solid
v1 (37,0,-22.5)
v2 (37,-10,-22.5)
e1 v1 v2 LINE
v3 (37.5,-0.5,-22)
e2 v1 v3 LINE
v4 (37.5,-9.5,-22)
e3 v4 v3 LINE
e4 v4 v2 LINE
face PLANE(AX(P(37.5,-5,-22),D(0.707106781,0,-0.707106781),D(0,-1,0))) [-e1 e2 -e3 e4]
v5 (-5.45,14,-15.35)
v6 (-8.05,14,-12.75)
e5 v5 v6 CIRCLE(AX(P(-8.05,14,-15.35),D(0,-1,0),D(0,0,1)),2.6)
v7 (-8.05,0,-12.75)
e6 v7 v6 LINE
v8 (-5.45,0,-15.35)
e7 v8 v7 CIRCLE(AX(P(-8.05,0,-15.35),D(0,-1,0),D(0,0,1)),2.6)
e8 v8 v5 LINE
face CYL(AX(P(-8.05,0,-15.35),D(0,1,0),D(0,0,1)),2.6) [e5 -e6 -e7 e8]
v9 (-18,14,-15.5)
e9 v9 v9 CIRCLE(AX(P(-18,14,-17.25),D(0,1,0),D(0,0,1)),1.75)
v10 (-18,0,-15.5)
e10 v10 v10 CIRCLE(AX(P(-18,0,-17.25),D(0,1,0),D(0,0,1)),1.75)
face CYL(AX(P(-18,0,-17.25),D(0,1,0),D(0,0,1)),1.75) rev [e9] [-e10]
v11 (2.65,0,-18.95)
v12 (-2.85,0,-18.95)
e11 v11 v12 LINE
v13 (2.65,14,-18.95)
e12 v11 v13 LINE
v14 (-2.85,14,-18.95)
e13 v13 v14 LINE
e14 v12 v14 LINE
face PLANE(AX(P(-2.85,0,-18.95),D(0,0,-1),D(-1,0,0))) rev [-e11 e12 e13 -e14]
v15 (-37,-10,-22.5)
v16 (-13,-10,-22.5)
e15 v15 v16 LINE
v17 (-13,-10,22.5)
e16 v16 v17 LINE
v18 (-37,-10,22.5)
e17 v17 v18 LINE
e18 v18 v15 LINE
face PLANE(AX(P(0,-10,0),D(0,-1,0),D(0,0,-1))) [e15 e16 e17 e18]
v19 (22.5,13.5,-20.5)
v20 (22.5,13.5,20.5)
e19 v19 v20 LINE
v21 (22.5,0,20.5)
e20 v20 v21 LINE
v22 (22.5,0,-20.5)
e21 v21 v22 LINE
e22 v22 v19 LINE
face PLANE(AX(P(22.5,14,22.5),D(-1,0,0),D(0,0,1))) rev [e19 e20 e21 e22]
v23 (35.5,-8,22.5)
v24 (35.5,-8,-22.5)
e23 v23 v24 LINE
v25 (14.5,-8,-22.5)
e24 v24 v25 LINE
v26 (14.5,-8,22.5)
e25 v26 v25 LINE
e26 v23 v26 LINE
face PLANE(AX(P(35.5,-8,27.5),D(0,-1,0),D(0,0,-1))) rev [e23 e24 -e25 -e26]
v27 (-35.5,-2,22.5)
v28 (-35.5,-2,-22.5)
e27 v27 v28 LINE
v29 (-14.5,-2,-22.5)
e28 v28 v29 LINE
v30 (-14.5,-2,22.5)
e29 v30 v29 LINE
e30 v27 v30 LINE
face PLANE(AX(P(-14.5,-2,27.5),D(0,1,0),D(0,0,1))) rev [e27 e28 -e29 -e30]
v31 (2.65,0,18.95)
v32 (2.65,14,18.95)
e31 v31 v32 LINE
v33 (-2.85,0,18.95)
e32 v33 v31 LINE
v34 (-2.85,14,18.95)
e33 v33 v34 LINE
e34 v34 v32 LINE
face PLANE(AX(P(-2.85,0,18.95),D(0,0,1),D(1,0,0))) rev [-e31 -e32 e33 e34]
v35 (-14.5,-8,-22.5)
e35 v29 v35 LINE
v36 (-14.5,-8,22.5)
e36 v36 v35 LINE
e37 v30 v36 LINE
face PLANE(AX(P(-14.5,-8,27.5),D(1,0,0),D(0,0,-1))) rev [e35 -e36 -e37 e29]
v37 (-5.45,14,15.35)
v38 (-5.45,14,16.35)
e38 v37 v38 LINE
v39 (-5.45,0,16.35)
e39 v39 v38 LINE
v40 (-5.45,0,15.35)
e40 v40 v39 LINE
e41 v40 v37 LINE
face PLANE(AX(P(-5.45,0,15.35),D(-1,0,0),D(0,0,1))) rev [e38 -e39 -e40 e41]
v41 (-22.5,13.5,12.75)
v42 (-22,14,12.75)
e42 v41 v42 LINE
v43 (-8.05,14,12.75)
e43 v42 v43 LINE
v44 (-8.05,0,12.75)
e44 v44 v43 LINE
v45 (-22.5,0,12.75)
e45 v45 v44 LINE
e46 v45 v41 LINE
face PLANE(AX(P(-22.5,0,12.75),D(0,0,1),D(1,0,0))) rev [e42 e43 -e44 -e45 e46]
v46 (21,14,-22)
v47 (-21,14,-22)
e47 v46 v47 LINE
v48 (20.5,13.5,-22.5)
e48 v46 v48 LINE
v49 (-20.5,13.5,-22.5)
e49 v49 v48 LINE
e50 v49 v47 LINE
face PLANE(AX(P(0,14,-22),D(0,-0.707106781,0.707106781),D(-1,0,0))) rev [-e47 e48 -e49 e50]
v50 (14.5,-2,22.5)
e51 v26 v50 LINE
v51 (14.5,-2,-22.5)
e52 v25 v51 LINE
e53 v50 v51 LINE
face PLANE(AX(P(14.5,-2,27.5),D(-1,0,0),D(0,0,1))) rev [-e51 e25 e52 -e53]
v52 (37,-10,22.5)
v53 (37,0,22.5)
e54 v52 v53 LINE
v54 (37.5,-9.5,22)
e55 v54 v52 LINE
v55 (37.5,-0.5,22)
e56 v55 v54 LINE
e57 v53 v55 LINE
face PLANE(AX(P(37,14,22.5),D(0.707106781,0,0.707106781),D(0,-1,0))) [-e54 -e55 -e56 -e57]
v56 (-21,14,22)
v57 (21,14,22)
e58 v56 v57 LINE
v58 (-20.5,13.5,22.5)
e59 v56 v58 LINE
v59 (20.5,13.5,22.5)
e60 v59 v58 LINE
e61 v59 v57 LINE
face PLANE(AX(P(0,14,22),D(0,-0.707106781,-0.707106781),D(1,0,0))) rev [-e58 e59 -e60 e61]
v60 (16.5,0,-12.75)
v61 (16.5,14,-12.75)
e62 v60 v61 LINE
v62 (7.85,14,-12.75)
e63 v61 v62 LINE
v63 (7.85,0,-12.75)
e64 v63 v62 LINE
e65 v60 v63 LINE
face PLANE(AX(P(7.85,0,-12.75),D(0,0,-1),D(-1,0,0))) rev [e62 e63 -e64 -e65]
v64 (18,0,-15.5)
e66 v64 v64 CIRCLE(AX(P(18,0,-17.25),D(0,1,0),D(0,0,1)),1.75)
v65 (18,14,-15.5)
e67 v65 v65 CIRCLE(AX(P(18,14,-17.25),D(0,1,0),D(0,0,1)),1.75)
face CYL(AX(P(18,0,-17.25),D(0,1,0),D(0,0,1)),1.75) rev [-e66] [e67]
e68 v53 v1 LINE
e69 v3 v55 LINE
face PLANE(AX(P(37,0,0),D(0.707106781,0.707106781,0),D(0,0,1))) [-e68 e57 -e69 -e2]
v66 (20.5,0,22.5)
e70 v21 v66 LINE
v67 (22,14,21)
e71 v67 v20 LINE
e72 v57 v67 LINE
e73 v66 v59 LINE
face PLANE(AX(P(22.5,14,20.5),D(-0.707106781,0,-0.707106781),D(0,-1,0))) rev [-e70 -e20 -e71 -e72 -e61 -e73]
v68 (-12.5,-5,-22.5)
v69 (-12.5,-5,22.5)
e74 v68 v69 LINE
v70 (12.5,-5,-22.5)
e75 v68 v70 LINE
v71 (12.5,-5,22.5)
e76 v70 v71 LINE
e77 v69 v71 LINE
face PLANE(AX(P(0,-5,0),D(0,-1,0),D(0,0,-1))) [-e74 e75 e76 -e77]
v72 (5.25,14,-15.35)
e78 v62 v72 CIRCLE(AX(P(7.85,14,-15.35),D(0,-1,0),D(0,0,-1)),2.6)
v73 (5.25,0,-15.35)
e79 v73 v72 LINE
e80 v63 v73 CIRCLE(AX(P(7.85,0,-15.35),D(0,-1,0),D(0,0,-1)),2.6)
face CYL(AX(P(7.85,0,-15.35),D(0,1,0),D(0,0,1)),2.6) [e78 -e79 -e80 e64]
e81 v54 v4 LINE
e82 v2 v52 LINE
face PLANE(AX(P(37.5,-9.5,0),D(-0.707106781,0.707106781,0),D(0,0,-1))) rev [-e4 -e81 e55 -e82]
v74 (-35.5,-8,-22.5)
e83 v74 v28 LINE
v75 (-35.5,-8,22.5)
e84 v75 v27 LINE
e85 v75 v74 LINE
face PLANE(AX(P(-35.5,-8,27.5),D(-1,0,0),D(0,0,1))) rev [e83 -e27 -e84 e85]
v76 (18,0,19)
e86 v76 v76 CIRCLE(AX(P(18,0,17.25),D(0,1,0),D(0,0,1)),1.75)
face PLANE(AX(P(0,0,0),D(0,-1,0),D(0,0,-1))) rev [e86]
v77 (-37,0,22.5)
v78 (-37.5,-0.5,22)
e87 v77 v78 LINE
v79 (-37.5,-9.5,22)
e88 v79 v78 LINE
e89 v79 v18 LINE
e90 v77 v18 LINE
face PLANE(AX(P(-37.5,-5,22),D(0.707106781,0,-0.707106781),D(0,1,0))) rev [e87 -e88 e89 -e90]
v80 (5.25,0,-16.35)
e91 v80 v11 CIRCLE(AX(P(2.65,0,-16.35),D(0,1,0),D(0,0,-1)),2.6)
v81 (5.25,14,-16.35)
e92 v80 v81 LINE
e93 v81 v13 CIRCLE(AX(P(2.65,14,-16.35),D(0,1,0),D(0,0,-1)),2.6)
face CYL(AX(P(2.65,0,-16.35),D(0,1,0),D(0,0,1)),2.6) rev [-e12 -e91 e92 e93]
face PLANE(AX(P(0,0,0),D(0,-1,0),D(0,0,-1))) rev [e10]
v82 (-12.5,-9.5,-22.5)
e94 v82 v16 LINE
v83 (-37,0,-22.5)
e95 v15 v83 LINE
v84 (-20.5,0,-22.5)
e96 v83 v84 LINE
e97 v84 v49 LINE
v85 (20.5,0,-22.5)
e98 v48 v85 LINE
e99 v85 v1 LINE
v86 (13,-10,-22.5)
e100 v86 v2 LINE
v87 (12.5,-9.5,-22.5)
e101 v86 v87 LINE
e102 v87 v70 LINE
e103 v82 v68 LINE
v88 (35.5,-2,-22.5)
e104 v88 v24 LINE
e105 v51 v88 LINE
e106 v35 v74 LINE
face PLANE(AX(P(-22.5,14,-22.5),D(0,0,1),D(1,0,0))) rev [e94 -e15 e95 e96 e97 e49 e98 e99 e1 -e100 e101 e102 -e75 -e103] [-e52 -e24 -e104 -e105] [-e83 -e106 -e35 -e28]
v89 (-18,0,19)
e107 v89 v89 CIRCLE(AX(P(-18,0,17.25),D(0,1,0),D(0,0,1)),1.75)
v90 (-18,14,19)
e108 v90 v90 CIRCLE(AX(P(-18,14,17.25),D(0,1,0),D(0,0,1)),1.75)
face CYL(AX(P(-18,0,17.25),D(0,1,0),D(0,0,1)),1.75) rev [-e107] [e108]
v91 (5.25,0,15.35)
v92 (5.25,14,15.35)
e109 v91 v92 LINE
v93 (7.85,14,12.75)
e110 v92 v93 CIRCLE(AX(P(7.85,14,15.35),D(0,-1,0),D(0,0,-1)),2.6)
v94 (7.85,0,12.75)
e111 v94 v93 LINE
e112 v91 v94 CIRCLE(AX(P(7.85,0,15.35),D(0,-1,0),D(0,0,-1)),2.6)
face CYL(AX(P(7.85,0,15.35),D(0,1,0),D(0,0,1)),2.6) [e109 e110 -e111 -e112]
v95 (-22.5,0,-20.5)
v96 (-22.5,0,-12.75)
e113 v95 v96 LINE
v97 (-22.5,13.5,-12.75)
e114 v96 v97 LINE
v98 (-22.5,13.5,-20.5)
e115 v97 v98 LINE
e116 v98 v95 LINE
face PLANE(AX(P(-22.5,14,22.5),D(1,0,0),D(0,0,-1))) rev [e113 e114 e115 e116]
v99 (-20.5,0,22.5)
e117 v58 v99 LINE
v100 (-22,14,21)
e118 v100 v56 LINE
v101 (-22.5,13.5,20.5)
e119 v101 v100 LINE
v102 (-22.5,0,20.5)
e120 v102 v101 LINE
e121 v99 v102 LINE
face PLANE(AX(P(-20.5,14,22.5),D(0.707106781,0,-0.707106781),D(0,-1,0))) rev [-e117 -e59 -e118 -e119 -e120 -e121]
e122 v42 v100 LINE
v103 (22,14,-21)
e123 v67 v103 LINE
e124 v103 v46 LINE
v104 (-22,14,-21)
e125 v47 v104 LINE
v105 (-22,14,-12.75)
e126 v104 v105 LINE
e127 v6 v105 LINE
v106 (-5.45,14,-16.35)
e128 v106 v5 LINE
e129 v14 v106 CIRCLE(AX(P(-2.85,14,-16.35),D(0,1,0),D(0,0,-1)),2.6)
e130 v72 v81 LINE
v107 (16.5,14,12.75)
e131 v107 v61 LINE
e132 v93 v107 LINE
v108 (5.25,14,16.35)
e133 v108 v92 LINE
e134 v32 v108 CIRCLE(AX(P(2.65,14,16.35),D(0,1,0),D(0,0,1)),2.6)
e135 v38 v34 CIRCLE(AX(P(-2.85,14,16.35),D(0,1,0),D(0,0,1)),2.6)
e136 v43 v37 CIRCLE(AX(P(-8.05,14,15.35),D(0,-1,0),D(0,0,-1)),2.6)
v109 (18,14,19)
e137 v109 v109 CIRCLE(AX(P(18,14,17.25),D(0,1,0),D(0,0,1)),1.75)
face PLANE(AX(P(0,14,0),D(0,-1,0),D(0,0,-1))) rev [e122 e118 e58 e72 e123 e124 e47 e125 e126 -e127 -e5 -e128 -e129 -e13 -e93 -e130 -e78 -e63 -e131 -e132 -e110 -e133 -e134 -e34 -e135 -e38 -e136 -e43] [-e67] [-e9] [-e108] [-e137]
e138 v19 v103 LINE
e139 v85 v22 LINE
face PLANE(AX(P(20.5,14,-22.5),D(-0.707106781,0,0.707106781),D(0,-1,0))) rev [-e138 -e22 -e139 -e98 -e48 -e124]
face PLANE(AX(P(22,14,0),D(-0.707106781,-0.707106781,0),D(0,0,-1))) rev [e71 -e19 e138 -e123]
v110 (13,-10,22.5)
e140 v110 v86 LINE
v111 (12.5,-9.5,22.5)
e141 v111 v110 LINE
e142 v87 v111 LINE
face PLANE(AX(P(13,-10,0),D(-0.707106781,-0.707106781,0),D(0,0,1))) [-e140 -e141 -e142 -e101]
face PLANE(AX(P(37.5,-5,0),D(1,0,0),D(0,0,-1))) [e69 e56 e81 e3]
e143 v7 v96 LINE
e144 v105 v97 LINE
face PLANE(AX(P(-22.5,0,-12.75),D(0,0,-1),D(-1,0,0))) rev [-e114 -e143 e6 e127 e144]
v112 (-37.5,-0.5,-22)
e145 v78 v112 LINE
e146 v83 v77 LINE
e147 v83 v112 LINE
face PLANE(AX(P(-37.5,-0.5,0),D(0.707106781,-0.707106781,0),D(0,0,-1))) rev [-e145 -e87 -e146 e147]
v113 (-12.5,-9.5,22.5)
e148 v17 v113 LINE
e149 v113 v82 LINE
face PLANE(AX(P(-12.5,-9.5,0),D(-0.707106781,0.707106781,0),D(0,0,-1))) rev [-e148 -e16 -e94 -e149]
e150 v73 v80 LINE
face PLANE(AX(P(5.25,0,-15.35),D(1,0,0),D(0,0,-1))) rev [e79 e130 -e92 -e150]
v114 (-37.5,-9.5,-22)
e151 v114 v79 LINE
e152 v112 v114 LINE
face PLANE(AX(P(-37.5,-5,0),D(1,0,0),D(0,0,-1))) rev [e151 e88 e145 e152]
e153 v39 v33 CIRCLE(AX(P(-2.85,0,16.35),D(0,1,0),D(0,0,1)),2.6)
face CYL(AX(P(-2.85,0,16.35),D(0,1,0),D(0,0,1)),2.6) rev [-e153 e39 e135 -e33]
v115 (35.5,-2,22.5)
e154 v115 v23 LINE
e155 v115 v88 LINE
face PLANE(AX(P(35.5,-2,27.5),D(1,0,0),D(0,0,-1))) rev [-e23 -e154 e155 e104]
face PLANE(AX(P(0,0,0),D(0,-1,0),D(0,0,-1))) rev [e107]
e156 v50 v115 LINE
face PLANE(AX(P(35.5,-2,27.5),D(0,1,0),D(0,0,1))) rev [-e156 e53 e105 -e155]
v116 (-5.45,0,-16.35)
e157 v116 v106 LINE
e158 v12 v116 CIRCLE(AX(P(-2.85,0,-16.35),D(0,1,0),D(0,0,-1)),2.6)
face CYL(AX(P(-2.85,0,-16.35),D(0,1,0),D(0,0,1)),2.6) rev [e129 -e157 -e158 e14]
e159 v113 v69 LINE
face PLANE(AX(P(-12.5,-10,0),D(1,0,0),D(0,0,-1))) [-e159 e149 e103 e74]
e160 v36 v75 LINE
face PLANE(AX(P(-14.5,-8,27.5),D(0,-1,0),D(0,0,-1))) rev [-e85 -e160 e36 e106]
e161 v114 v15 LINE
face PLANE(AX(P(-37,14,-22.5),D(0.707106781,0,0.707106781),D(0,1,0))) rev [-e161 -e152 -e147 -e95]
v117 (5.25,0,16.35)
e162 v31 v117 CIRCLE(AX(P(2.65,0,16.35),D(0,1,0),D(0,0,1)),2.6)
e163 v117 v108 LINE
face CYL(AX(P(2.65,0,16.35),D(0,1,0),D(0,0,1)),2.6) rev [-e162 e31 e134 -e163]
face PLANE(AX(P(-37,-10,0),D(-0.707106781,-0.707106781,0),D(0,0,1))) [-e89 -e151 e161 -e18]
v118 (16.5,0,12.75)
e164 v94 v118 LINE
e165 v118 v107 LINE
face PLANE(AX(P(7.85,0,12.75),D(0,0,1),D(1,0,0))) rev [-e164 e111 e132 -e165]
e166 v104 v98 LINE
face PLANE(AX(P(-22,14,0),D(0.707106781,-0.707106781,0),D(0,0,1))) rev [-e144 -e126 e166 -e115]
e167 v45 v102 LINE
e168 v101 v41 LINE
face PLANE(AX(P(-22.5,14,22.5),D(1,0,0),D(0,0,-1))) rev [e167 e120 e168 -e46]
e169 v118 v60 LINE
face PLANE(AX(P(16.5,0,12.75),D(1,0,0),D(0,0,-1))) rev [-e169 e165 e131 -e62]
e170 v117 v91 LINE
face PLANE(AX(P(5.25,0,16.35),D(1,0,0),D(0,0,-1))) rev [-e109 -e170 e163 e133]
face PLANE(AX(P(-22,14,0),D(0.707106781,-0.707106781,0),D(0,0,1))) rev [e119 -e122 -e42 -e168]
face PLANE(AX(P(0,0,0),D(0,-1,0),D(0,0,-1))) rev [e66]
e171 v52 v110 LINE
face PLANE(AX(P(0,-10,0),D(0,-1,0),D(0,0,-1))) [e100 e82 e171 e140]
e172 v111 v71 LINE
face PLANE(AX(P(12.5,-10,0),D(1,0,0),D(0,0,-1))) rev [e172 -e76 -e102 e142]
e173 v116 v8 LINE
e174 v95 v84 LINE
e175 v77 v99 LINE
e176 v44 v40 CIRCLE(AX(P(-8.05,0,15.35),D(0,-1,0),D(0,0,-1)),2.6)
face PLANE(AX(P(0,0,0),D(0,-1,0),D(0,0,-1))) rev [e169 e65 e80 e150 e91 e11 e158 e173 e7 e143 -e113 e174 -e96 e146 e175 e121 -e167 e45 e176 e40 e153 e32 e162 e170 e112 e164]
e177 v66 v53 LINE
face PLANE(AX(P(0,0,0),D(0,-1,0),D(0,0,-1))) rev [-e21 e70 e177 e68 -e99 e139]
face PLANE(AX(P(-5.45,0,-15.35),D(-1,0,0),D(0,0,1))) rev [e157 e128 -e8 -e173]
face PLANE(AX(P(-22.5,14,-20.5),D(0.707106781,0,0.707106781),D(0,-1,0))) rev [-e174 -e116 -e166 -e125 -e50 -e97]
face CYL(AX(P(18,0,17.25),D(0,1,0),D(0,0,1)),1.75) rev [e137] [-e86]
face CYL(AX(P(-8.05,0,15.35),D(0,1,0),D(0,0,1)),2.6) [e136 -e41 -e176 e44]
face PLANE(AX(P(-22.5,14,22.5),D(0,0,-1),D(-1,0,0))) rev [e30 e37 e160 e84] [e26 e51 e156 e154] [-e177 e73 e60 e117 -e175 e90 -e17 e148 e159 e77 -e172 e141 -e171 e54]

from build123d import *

# Parameters (mm, degrees)
SKETCH1_W           = 45
SKETCH1_H           = 45
BOSS_EXTRUDE1_DEPTH = 14
CUT_EXTRUDE1_DEPTH  = 35.763486592
CHAMFER1_SIZE       = 0.5
CHAMFER2_SIZE       = 2
SKETCH4_R           = 1.75
CUT_EXTRUDE2_DEPTH  = 35.763486592
SKETCH5_R           = 1.75
SKETCH5_W           = 4
SKETCH5_H           = 25.5
BOSS_EXTRUDE4_DEPTH = 5
SKETCH5_3_R         = 1.75
SKETCH5_3_W         = 4
SKETCH5_3_H         = 25.5
BOSS_EXTRUDE5_DEPTH = 10
SKETCH10_W          = 21
SKETCH10_H          = 6
CUT_EXTRUDE3_DEPTH  = 50
CHAMFER5_SIZE       = 0.5


with BuildPart() as part:
    # Sketch1 → Boss-Extrude1 (new body)
    with BuildSketch(Plane(origin=(0, 0, 0), x_dir=(1, 0, 0), z_dir=(0, 1, 0))):
        Rectangle(SKETCH1_W, SKETCH1_H)
    extrude(amount=BOSS_EXTRUDE1_DEPTH)

    # Sketch3 → Cut-Extrude1 (cut, through all)
    with BuildSketch(Plane(origin=(0, 14, 0), x_dir=(1, 0, 0), z_dir=(0, 1, 0))):
        with BuildLine():
            Line((-22.5, 12.75), (-8.05, 12.75))
            ThreePointArc((-8.05, 12.75), (-6.211522369, 13.511522369), (-5.45, 15.35))
            Line((-5.45, 15.35), (-5.45, 16.35))
            ThreePointArc((-5.45, 16.35), (-4.688477631, 18.188477631), (-2.85, 18.95))
            Line((-2.85, 18.95), (2.65, 18.95))
            ThreePointArc((2.65, 18.95), (4.488477631, 18.188477631), (5.25, 16.35))
            Line((5.25, 16.35), (5.25, 15.35))
            ThreePointArc((5.25, 15.35), (6.011522369, 13.511522369), (7.85, 12.75))
            Line((7.85, 12.75), (16.5, 12.75))
            Line((16.5, 12.75), (16.5, -12.75))
            Line((16.5, -12.75), (7.85, -12.75))
            ThreePointArc((7.85, -12.75), (6.011522369, -13.511522369), (5.25, -15.35))
            Line((5.25, -15.35), (5.25, -16.35))
            ThreePointArc((5.25, -16.35), (4.488477631, -18.188477631), (2.65, -18.95))
            Line((2.65, -18.95), (-2.85, -18.95))
            ThreePointArc((-2.85, -18.95), (-4.688477631, -18.188477631), (-5.45, -16.35))
            Line((-5.45, -16.35), (-5.45, -15.35))
            ThreePointArc((-5.45, -15.35), (-6.211522369, -13.511522369), (-8.05, -12.75))
            Line((-8.05, -12.75), (-22.5, -12.75))
            Line((-22.5, -12.75), (-22.5, 12.75))
        make_face()
    extrude(amount=-CUT_EXTRUDE1_DEPTH, mode=Mode.SUBTRACT)

    # Chamfer1
    chamfer1_edges = [part.edges().sort_by_distance(p)[0] for p in [
        (-22.5, 14, -17.625),
        (0, 14, 22.5),
        (-22.5, 14, 17.625),
        (22.5, 14, 0),
        (0, 14, -22.5),
    ]]
    chamfer(chamfer1_edges, length=CHAMFER1_SIZE)

    # Chamfer2
    # the kernel refuses this chamfer: 5.464101615, 2 mm, written as the material it takes off along each edge
    # the kernel refuses this chamfer: 5.464101615, 2 mm, written as the material it takes off along each edge
    with BuildSketch(Plane(origin=(-22.5, -5.143365976, -22.5), x_dir=(-0.027495876610585647, 0, 0.9996219169112968), z_dir=(0, 1, 0)), Plane(origin=(-22.5, -5.143365976, 22.5), x_dir=(0.9996219169112968, 0, 0.027495876610585647), z_dir=(0, 1, 0))) as chamfer2_2_piece_1:
        Polygon((CHAMFER2_SIZE * 0.999621916911, CHAMFER2_SIZE * 0.0274958766106), (-CHAMFER2_SIZE * 0.0274958766106, CHAMFER2_SIZE * 0.999621916911), (0, 0), align=None)
    extrude(amount=23.786731952, mode=Mode.SUBTRACT)
    with BuildSketch(Plane(origin=(22.5, -5.143365976, 22.5), x_dir=(-0.9996219169112968, 0, 0.027495876610585647), z_dir=(0, 1, 0)), Plane(origin=(22.5, -5.143365976, -22.5), x_dir=(0.027495876610585647, 0, 0.9996219169112968), z_dir=(0, 1, 0))) as chamfer2_2_piece_2:
        Polygon((CHAMFER2_SIZE * 0.999621916911, -CHAMFER2_SIZE * 0.0274958766106), (-CHAMFER2_SIZE * 0.0274958766106, -CHAMFER2_SIZE * 0.999621916911), (0, 0), align=None)
    extrude(amount=23.786731952, mode=Mode.SUBTRACT)

    # Sketch4 → Cut-Extrude2 (cut, through all)
    with BuildSketch(Plane(origin=(0, 14, 0), x_dir=(1, 0, 0), z_dir=(0, 1, 0))):
        with Locations(Location((-18, 17.25, 0), (0, 0, 270))):
            Circle(SKETCH4_R)
        with Locations(Location((18, 17.25, 0), (0, 0, 270))):
            Circle(SKETCH4_R)
        with Locations(Location((18, -17.25, 0), (0, 0, 270))):
            Circle(SKETCH4_R)
        with Locations(Location((-18, -17.25, 0), (0, 0, 270))):
            Circle(SKETCH4_R)
    extrude(amount=-CUT_EXTRUDE2_DEPTH, mode=Mode.SUBTRACT)

    # Sketch5 → Boss-Extrude4 (add)
    # profile 1 of 13: a face of its own
    with BuildSketch(Plane.XZ):
        Polygon((-20.5, 22.5), (-37.5, 22.5), (-37.5, -22.5), (-20.5, -22.5), (-22.5, -20.5), (-22.5, -12.75), (-12.5, -12.75), (-12.5, 12.75), (-22.5, 12.75), (-22.5, 20.5), align=None)
    # profile 2 of 13: a face of its own
    with BuildSketch(Plane.XZ):
        with BuildLine():
            Line((-8.05, 12.75), (-12.5, 12.75))
            Line((-12.5, 12.75), (-12.5, -12.75))
            Line((-12.5, -12.75), (-8.05, -12.75))
            ThreePointArc((-8.05, -12.75), (-6.211522369, -13.511522369), (-5.45, -15.35))
            Line((-5.45, -15.35), (-5.45, -16.35))
            ThreePointArc((-5.45, -16.35), (-4.688477631, -18.188477631), (-2.85, -18.95))
            Line((-2.85, -18.95), (2.65, -18.95))
            ThreePointArc((2.65, -18.95), (4.488477631, -18.188477631), (5.25, -16.35))
            Line((5.25, -16.35), (5.25, -15.35))
            ThreePointArc((5.25, -15.35), (6.011522369, -13.511522369), (7.85, -12.75))
            Line((7.85, -12.75), (12.5, -12.75))
            Line((12.5, -12.75), (12.5, 12.75))
            Line((12.5, 12.75), (7.85, 12.75))
            ThreePointArc((7.85, 12.75), (6.011522369, 13.511522369), (5.25, 15.35))
            Line((5.25, 15.35), (5.25, 16.35))
            ThreePointArc((5.25, 16.35), (4.488477631, 18.188477631), (2.65, 18.95))
            Line((2.65, 18.95), (-2.85, 18.95))
            ThreePointArc((-2.85, 18.95), (-4.688477631, 18.188477631), (-5.45, 16.35))
            Line((-5.45, 16.35), (-5.45, 15.35))
            ThreePointArc((-5.45, 15.35), (-6.211522369, 13.511522369), (-8.05, 12.75))
        make_face()
    # profile 3 of 13: a face of its own
    with BuildSketch(Plane.XZ):
        with BuildLine():
            Line((12.5, 22.5), (-12.5, 22.5))
            Line((-12.5, 22.5), (-12.5, 12.75))
            Line((-12.5, 12.75), (-8.05, 12.75))
            ThreePointArc((-8.05, 12.75), (-6.211522369, 13.511522369), (-5.45, 15.35))
            Line((-5.45, 15.35), (-5.45, 16.35))
            ThreePointArc((-5.45, 16.35), (-4.688477631, 18.188477631), (-2.85, 18.95))
            Line((-2.85, 18.95), (2.65, 18.95))
            ThreePointArc((2.65, 18.95), (4.488477631, 18.188477631), (5.25, 16.35))
            Line((5.25, 16.35), (5.25, 15.35))
            ThreePointArc((5.25, 15.35), (6.011522369, 13.511522369), (7.85, 12.75))
            Line((7.85, 12.75), (12.5, 12.75))
            Line((12.5, 12.75), (12.5, 22.5))
        make_face()
    # profile 4 of 13: a face of its own
    with BuildSketch(Plane.XZ):
        Polygon((-12.5, 22.5), (-20.5, 22.5), (-22.5, 20.5), (-22.5, 12.75), (-12.5, 12.75), align=None)
        with Locations(Location((-18, 17.25, 0), (0, 0, 90))):
            Circle(SKETCH5_R, mode=Mode.SUBTRACT)
    # profile 5 of 13: a face of its own
    with BuildSketch(Plane.XZ):
        Polygon((20.5, 22.5), (12.5, 22.5), (12.5, 12.75), (16.5, 12.75), (16.5, -12.75), (12.5, -12.75), (12.5, -22.5), (20.5, -22.5), (22.5, -20.5), (22.5, 20.5), align=None)
        with Locations(Location((18, -17.25, 0), (0, 0, 90))):
            Circle(SKETCH5_R, mode=Mode.SUBTRACT)
        with Locations(Location((18, 17.25, 0), (0, 0, 90))):
            Circle(SKETCH5_R, mode=Mode.SUBTRACT)
    # profile 6 of 13: a face of its own
    with BuildSketch(Plane.XZ):
        Polygon((37.5, 22.5), (20.5, 22.5), (22.5, 20.5), (22.5, -20.5), (20.5, -22.5), (37.5, -22.5), align=None)
    # profile 7 of 13: a face of its own
    with BuildSketch(Plane.XZ):
        with BuildLine():
            Line((-12.5, -12.75), (-12.5, -22.5))
            Line((-12.5, -22.5), (12.5, -22.5))
            Line((12.5, -22.5), (12.5, -12.75))
            Line((12.5, -12.75), (7.85, -12.75))
            ThreePointArc((7.85, -12.75), (6.011522369, -13.511522369), (5.25, -15.35))
            Line((5.25, -15.35), (5.25, -16.35))
            ThreePointArc((5.25, -16.35), (4.488477631, -18.188477631), (2.65, -18.95))
            Line((2.65, -18.95), (-2.85, -18.95))
            ThreePointArc((-2.85, -18.95), (-4.688477631, -18.188477631), (-5.45, -16.35))
            Line((-5.45, -16.35), (-5.45, -15.35))
            ThreePointArc((-5.45, -15.35), (-6.211522369, -13.511522369), (-8.05, -12.75))
            Line((-8.05, -12.75), (-12.5, -12.75))
        make_face()
    # profile 8 of 13: a face of its own
    with BuildSketch(Plane.XZ):
        Polygon((-22.5, -20.5), (-20.5, -22.5), (-12.5, -22.5), (-12.5, -12.75), (-22.5, -12.75), align=None)
        with Locations(Location((-18, -17.25, 0), (0, 0, 90))):
            Circle(SKETCH5_R, mode=Mode.SUBTRACT)
    # profile 9 of 13: a face of its own
    with BuildSketch(Plane.XZ):
        with Locations((14.5, 0)):
            Rectangle(SKETCH5_W, SKETCH5_H)
    # profile 10 of 13: a face of its own
    with BuildSketch(Plane.XZ):
        with Locations(Location((18, 17.25, 0), (0, 0, 90))):
            Circle(SKETCH5_R)
    # profile 11 of 13: a face of its own
    with BuildSketch(Plane.XZ):
        with Locations(Location((-18, 17.25, 0), (0, 0, 90))):
            Circle(SKETCH5_R)
    # profile 12 of 13: a face of its own
    with BuildSketch(Plane.XZ):
        with Locations(Location((-18, -17.25, 0), (0, 0, 90))):
            Circle(SKETCH5_R)
    # profile 13 of 13: a face of its own
    with BuildSketch(Plane.XZ):
        with Locations(Location((18, -17.25, 0), (0, 0, 90))):
            Circle(SKETCH5_R)
    extrude(amount=BOSS_EXTRUDE4_DEPTH)

    # Sketch5<3> → Boss-Extrude5 (add)
    # profile 1 of 10: a face of its own
    with BuildSketch(Plane.XZ):
        Polygon((-12.5, 22.5), (-20.5, 22.5), (-22.5, 20.5), (-22.5, 12.75), (-12.5, 12.75), align=None)
        with Locations(Location((-18, 17.25, 0), (0, 0, 90))):
            Circle(SKETCH5_3_R, mode=Mode.SUBTRACT)
    # profile 2 of 10: a face of its own
    with BuildSketch(Plane.XZ):
        Polygon((-20.5, 22.5), (-37.5, 22.5), (-37.5, -22.5), (-20.5, -22.5), (-22.5, -20.5), (-22.5, -12.75), (-12.5, -12.75), (-12.5, 12.75), (-22.5, 12.75), (-22.5, 20.5), align=None)
    # profile 3 of 10: a face of its own
    with BuildSketch(Plane.XZ):
        Polygon((-22.5, -20.5), (-20.5, -22.5), (-12.5, -22.5), (-12.5, -12.75), (-22.5, -12.75), align=None)
        with Locations(Location((-18, -17.25, 0), (0, 0, 90))):
            Circle(SKETCH5_3_R, mode=Mode.SUBTRACT)
    # profile 4 of 10: a face of its own
    with BuildSketch(Plane.XZ):
        with Locations(Location((-18, 17.25, 0), (0, 0, 90))):
            Circle(SKETCH5_3_R)
    # profile 5 of 10: a face of its own
    with BuildSketch(Plane.XZ):
        with Locations(Location((-18, -17.25, 0), (0, 0, 90))):
            Circle(SKETCH5_3_R)
    # profile 6 of 10: a face of its own
    with BuildSketch(Plane.XZ):
        Polygon((20.5, 22.5), (12.5, 22.5), (12.5, 12.75), (16.5, 12.75), (16.5, -12.75), (12.5, -12.75), (12.5, -22.5), (20.5, -22.5), (22.5, -20.5), (22.5, 20.5), align=None)
        with Locations(Location((18, -17.25, 0), (0, 0, 90))):
            Circle(SKETCH5_3_R, mode=Mode.SUBTRACT)
        with Locations(Location((18, 17.25, 0), (0, 0, 90))):
            Circle(SKETCH5_3_R, mode=Mode.SUBTRACT)
    # profile 7 of 10: a face of its own
    with BuildSketch(Plane.XZ):
        Polygon((37.5, 22.5), (20.5, 22.5), (22.5, 20.5), (22.5, -20.5), (20.5, -22.5), (37.5, -22.5), align=None)
    # profile 8 of 10: a face of its own
    with BuildSketch(Plane.XZ):
        with Locations((14.5, 0)):
            Rectangle(SKETCH5_3_W, SKETCH5_3_H)
    # profile 9 of 10: a face of its own
    with BuildSketch(Plane.XZ):
        with Locations(Location((18, 17.25, 0), (0, 0, 90))):
            Circle(SKETCH5_3_R)
    # profile 10 of 10: a face of its own
    with BuildSketch(Plane.XZ):
        with Locations(Location((18, -17.25, 0), (0, 0, 90))):
            Circle(SKETCH5_3_R)
    extrude(amount=BOSS_EXTRUDE5_DEPTH)

    # Sketch10 → Cut-Extrude3 (cut)
    with BuildSketch(Plane(origin=(0, 0, -22.5), x_dir=(-1, 0, 0), z_dir=(0, 0, -1))):
        with Locations((-25, -5)):
            Rectangle(SKETCH10_W, SKETCH10_H)
        with Locations((25, -5)):
            Rectangle(SKETCH10_W, SKETCH10_H)
    extrude(amount=-CUT_EXTRUDE3_DEPTH, mode=Mode.SUBTRACT)

    # Chamfer5
    chamfer5_edges = [part.edges().sort_by_distance(p)[0] for p in [
        (37.5, 0, 0),
        (-37.5, -5, -22.5),
        (37.5, -5, -22.5),
        (37.5, -5, 22.5),
        (-37.5, 0, 0),
        (-37.5, -5, 22.5),
        (-12.5, -10, 0),
        (-37.5, -10, 0),
        (37.5, -10, 0),
        (12.5, -10, 0),
    ]]
    chamfer(chamfer5_edges, length=CHAMFER5_SIZE)


solid = part.part
